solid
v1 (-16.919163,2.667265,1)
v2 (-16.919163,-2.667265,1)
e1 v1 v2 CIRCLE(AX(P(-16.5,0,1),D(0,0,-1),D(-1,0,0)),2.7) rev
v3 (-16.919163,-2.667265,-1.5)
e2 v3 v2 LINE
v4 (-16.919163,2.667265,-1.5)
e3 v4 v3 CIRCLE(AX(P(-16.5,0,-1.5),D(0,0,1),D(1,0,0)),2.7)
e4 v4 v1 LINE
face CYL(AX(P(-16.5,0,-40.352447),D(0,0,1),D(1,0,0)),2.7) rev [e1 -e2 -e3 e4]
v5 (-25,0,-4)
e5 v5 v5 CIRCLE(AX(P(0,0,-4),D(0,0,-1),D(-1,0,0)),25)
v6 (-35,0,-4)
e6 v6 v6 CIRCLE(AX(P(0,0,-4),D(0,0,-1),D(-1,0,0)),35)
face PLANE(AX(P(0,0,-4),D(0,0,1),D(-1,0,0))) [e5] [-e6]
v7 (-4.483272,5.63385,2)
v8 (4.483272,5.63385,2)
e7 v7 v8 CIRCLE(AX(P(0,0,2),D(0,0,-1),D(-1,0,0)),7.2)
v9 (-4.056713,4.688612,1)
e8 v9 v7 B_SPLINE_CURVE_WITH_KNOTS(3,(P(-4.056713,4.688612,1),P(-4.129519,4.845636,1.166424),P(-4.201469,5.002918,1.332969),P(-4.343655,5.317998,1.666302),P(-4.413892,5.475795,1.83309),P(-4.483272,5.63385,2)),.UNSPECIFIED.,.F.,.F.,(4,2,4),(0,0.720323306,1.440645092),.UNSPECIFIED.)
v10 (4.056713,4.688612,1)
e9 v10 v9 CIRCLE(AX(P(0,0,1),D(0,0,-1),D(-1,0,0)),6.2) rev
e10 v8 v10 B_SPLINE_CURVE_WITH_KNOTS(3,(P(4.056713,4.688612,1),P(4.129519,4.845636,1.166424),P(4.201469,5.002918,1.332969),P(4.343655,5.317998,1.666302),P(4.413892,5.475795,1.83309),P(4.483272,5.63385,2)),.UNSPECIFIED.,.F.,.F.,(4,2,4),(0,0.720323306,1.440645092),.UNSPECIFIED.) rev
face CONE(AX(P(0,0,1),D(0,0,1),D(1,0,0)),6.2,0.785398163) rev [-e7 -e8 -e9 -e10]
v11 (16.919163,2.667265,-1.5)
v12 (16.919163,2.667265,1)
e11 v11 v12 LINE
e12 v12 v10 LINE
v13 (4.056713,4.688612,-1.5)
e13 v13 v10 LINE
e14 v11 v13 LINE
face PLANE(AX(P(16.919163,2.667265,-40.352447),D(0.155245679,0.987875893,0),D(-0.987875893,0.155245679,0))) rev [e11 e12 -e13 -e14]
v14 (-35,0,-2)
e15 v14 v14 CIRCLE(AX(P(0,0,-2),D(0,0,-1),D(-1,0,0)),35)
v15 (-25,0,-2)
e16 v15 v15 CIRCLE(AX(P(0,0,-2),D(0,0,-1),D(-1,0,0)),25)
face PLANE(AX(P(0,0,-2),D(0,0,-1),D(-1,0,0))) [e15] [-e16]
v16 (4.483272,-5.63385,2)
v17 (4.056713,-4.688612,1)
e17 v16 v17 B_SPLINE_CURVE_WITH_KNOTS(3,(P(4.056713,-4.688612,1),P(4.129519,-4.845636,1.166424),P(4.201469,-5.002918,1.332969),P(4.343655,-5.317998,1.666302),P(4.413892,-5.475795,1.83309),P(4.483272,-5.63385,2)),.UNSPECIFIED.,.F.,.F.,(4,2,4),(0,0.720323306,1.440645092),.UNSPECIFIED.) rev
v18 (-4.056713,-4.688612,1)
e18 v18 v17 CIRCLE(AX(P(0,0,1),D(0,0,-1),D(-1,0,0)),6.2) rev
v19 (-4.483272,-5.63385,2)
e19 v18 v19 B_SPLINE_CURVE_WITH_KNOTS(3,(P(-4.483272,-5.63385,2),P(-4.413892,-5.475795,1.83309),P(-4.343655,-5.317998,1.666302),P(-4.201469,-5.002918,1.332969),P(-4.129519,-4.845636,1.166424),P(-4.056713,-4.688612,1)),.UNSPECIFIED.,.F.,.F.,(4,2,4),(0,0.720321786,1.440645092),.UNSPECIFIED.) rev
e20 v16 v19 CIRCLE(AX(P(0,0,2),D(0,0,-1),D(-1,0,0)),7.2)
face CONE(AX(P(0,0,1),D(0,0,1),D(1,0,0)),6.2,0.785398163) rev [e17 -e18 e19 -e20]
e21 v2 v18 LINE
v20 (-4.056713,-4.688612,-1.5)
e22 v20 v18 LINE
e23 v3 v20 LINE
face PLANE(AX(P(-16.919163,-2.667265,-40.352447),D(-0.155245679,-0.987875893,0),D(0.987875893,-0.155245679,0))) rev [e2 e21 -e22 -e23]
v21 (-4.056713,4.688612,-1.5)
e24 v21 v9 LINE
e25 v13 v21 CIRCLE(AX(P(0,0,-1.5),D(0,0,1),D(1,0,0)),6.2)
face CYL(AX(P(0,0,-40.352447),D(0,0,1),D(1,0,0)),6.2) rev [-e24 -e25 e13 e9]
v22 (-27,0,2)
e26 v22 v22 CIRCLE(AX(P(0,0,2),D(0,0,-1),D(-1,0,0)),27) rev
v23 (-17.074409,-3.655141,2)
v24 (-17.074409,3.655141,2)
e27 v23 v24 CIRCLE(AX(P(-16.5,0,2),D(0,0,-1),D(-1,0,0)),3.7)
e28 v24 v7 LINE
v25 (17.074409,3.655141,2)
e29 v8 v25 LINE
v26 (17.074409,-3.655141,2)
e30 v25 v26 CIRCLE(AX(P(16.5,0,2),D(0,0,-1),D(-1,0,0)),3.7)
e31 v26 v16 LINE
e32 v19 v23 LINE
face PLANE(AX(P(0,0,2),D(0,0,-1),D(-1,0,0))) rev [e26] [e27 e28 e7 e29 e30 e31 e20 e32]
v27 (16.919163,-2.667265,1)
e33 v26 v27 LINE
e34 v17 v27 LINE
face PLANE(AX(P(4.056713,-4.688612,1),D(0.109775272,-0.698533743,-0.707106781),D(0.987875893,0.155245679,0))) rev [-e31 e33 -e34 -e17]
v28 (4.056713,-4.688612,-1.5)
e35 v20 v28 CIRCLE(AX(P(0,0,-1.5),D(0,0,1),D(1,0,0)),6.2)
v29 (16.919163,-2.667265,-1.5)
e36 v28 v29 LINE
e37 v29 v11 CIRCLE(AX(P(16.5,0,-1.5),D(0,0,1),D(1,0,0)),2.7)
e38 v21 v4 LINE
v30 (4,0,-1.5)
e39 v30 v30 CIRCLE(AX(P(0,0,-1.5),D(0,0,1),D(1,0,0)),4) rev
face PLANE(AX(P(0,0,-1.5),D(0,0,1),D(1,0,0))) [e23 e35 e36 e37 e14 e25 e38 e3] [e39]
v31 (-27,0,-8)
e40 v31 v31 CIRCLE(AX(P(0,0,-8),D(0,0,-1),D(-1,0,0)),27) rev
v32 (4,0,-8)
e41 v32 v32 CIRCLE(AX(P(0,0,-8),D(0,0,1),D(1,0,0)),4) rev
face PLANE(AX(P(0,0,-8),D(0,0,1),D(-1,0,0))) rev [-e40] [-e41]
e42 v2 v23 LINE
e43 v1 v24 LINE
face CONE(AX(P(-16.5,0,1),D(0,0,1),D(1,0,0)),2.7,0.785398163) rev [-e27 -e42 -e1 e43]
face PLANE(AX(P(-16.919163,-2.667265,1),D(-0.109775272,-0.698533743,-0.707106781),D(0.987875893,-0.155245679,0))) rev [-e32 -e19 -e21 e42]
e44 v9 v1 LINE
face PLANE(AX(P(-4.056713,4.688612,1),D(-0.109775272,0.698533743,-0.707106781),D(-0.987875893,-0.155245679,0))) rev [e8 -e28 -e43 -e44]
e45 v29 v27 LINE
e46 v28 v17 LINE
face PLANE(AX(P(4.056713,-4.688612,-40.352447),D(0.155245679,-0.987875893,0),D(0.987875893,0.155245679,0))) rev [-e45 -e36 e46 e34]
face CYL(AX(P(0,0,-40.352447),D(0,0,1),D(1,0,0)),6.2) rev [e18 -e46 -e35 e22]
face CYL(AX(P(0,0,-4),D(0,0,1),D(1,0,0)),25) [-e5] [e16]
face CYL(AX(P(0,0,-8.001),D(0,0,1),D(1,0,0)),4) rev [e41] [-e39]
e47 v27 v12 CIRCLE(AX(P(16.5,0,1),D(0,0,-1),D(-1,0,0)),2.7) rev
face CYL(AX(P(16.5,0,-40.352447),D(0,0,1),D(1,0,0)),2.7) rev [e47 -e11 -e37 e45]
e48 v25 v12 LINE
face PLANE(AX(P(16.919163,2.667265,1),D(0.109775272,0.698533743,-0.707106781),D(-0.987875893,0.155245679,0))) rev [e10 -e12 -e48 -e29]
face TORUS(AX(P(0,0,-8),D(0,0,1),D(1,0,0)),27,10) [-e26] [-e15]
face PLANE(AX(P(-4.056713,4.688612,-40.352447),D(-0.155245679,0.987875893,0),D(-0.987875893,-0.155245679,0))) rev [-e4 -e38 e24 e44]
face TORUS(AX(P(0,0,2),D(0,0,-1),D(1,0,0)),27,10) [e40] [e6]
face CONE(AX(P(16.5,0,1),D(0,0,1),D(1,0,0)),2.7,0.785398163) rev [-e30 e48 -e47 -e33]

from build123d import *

# Parameters (mm, degrees)
SKETCH_1_R               = 1.5
EXTRUDE_1_DEPTH          = 2.3
SKETCH_2_R               = 4.4
EXTRUDE_2_DEPTH          = 3.2
SKETCH_3_R               = 4.4
SKETCH_3_R_2             = 3.4
SKETCH_3_R_3             = 2.75
SKETCH_3_R_4             = 1.5
CUT_EXTRUDE_1_DEPTH      = 1
BOSS_EXTRUDE1_DEPTH      = 2
BOSS_EXTRUDE1_DEPTH_BACK = 2
SKETCH1_R                = 35
INTERSECT2_OUTLINE_R     = 4.4
INTERSECT2_OUTLINE_R_2   = 3.4
INTERSECT2_OUTLINE_R_3   = 2.75
INTERSECT2_DEPTH         = 5.5
INTERSECT2_START         = 1
INTERSECT2_2_OUTLINE_R   = 4.4
INTERSECT2_2_OUTLINE_R_2 = 3.4
INTERSECT2_2_OUTLINE_R_3 = 2.75
INTERSECT2_2_OUTLINE_R_4 = 1.5
INTERSECT2_2_DEPTH       = 4.5
FILLET1_R                = 10
SKETCH2_R                = 25
BOSS_EXTRUDE2_DEPTH      = 2
SKETCH3_R                = 27
BOSS_EXTRUDE3_DEPTH      = 2
SKETCH4_R                = 6
CUT_EXTRUDE1_DEPTH       = 2
CUT_EXTRUDE3_REACH       = 52.14
SKETCH5_R                = 4
CUT_EXTRUDE4_START       = -2
CUT_EXTRUDE4_DEPTH       = 2
CHAMFER1_SIZE            = 1
CUT_EXTRUDE5_DEPTH       = 1.5


# Read off the part's stored shape, not the designer's step: Intersect2
with BuildPart() as part:
    # Эскиз1 → Бобышка-Вытянуть1 (new body)
    with BuildSketch(Plane.XY):
        with BuildLine():
            Line((-3.968626967, 4.5), (-16.888114198, 2.469689731))
            ThreePointArc((-16.888114198, 2.469689731), (-19, 0), (-16.888114198, -2.469689731))
            Line((-16.888114198, -2.469689731), (-3.968626967, -4.5))
            ThreePointArc((-3.968626967, -4.5), (0, -6), (3.968626967, -4.5))
            Line((3.968626967, -4.5), (16.888114198, -2.469689731))
            ThreePointArc((16.888114198, -2.469689731), (19, 0), (16.888114198, 2.469689731))
            Line((16.888114198, 2.469689731), (3.968626967, 4.5))
            ThreePointArc((3.968626967, 4.5), (0, 6), (-3.968626967, 4.5))
        make_face()
        Circle(SKETCH_1_R, mode=Mode.SUBTRACT)
    extrude(amount=EXTRUDE_1_DEPTH)

    # Эскиз2 → Бобышка-Вытянуть2 (add)
    with BuildSketch(Plane.XY.offset(2.3)):
        with Locations(Location((0, 0, 0), (0, 0, 180))):
            Circle(SKETCH_2_R)
        Polygon((0.333439775, 2.639447604), (0, 3.05), (-0.333439775, 2.639447604), (-0.758504156, 2.954178641), (-0.979368078, 2.473601404), (-1.469348706, 2.672735374), (-1.563759083, 2.15232973), (-2.087868673, 2.223354314), (-2.049893354, 1.695819264), (-2.575200173, 1.634271725), (-2.407225286, 1.132754236), (-2.900722375, 0.942501833), (-2.6133024, 0.498514094), (-3.043981522, 0.191511085), (-2.655176114, -0.167049522), (-2.995976115, -0.571513009), (-2.530215347, -0.822116802), (-2.75972251, -1.298626839), (-2.246271844, -1.42552746), (-2.35006539, -1.944143169), (-1.821186821, -1.939366985), (-1.792745019, -2.467501833), (-1.281669931, -2.33134895), (-1.122779886, -2.835818282), (-0.661621006, -2.576843686), (-0.382266362, -3.025949839), (0, -2.660425857), (0.382266362, -3.025949839), (0.661621006, -2.576843686), (1.122779886, -2.835818282), (1.281669931, -2.33134895), (1.792745019, -2.467501833), (1.821186821, -1.939366985), (2.35006539, -1.944143169), (2.246271844, -1.42552746), (2.75972251, -1.298626839), (2.530215347, -0.822116802), (2.995976115, -0.571513009), (2.655176114, -0.167049522), (3.043981522, 0.191511085), (2.6133024, 0.498514094), (2.900722375, 0.942501833), (2.407225286, 1.132754236), (2.575200173, 1.634271725), (2.049893354, 1.695819264), (2.087868673, 2.223354314), (1.563759083, 2.15232973), (1.469348706, 2.672735374), (0.979368078, 2.473601404), (0.758504156, 2.954178641), align=None, mode=Mode.SUBTRACT)
    extrude(amount=EXTRUDE_2_DEPTH)

    # Эскиз3 → Вырез-Вытянуть1 (cut)
    # profile 1 of 2: a face of its own
    with BuildSketch(Plane(origin=(0, 0, 0), x_dir=(-1, 0, 0), z_dir=(0, 0, -1))):
        Circle(SKETCH_3_R)
        Circle(SKETCH_3_R_2, mode=Mode.SUBTRACT)
    # profile 2 of 2: a face of its own
    with BuildSketch(Plane(origin=(0, 0, 0), x_dir=(-1, 0, 0), z_dir=(0, 0, -1))):
        Circle(SKETCH_3_R_3)
        Circle(SKETCH_3_R_4, mode=Mode.SUBTRACT)
    extrude(amount=-CUT_EXTRUDE_1_DEPTH, mode=Mode.SUBTRACT)


with BuildPart() as body_2:
    # Sketch1 → Boss-Extrude1 (new, two sides: drawn at the far end of the back side and taken through both)
    with BuildSketch(Plane(origin=(0, 0, 0), x_dir=(-1, 0, 0), z_dir=(0, 0, -1)).offset(-BOSS_EXTRUDE1_DEPTH_BACK)):
        Circle(SKETCH1_R)
    extrude(amount=BOSS_EXTRUDE1_DEPTH + BOSS_EXTRUDE1_DEPTH_BACK)


with BuildPart() as intersect2_tool:
    # Intersect2 outline → Intersect2 (new body)
    # profile 1 of 2: a face of its own
    with BuildSketch(Plane.XY):
        with BuildLine():
            ThreePointArc((3.968626967, 4.5), (0, 6), (-3.968626967, 4.5))
            Line((-3.968626967, 4.5), (-16.888114198, 2.469689731))
            ThreePointArc((-16.888114198, 2.469689731), (-19, 0), (-16.888114198, -2.469689731))
            Line((-16.888114198, -2.469689731), (-3.968626967, -4.5))
            ThreePointArc((-3.968626967, -4.5), (0, -6), (3.968626967, -4.5))
            Line((3.968626967, -4.5), (16.888114198, -2.469689731))
            ThreePointArc((16.888114198, -2.469689731), (19, 0), (16.888114198, 2.469689731))
            Line((16.888114198, 2.469689731), (3.968626967, 4.5))
        make_face()
        Circle(INTERSECT2_OUTLINE_R, mode=Mode.SUBTRACT)
    # profile 2 of 2: a face of its own
    with BuildSketch(Plane.XY):
        Circle(INTERSECT2_OUTLINE_R_2)
        Circle(INTERSECT2_OUTLINE_R_3, mode=Mode.SUBTRACT)
    extrude(amount=INTERSECT2_DEPTH)


with BuildPart() as part_1:
    add(part.part)

    # Intersect2: cut by intersect2_tool
    add(intersect2_tool.part, mode=Mode.SUBTRACT)


with BuildPart() as body_2_1:
    add(body_2.part)

    # Intersect2: cut by intersect2_tool
    add(intersect2_tool.part, mode=Mode.SUBTRACT)


with BuildPart() as intersect2_2_tool:
    # Intersect2 2 outline → Intersect2 2 (new body)
    # profile 1 of 2: a face of its own
    with BuildSketch(Plane.XY.offset(INTERSECT2_START)):
        Circle(INTERSECT2_2_OUTLINE_R)
        Circle(INTERSECT2_2_OUTLINE_R_2, mode=Mode.SUBTRACT)
    # profile 2 of 2: a face of its own
    with BuildSketch(Plane.XY.offset(INTERSECT2_START)):
        Circle(INTERSECT2_2_OUTLINE_R_3)
        Circle(INTERSECT2_2_OUTLINE_R_4, mode=Mode.SUBTRACT)
    extrude(amount=INTERSECT2_2_DEPTH)


with BuildPart() as part_2:
    add(part_1.part)

    # Intersect2 2: cut by intersect2_2_tool
    add(intersect2_2_tool.part, mode=Mode.SUBTRACT)


with BuildPart() as body_2_2:
    add(body_2_1.part)

    # Intersect2 2: cut by intersect2_2_tool
    add(intersect2_2_tool.part, mode=Mode.SUBTRACT)

    # Fillet1
    # the kernel refuses this fillet: 10 mm, written as the material it takes off along each edge
    with BuildSketch(Plane(origin=(0, 0, 2), x_dir=(-1, 0, 0), z_dir=(0, -1, 0))) as fillet1_piece_1:
        with BuildLine():
            CenterArc((27, 10), FILLET1_R, 270, 53.130102354)
            Line((27, 0), (27, -0.2))
            Line((27, -0.2), (35, -0.2))
            Line((35, -0.2), (35.2, 0))
            ThreePointArc((35.2, 0), (35.2, 2), (35.16, 3.88))
            Line((35.16, 3.88), (35, 4))
        make_face()
    revolve(axis=Axis((0, 0, 2), (0, 0, -1)), mode=Mode.SUBTRACT)


with BuildPart() as body_2_2_1:
    # Mirror9: mirrored copy
    add(body_2_2.part.mirror(Plane.XY.offset(-3)))


with BuildPart() as body_2_3:
    add(body_2_2.part)

    add(body_2_2_1.part)  # Boss-Extrude2 merges body 2 2
    # Sketch2 → Boss-Extrude2 (add)
    with BuildSketch(Plane(origin=(0, 0, -2), x_dir=(-1, 0, 0), z_dir=(0, 0, -1))):
        Circle(SKETCH2_R)
    extrude(amount=BOSS_EXTRUDE2_DEPTH)

    # Sketch3 → Boss-Extrude3 (add)
    with BuildSketch(Plane(origin=(0, 0, -8), x_dir=(-1, 0, 0), z_dir=(0, 0, -1))):
        Circle(SKETCH3_R)
    extrude(amount=-BOSS_EXTRUDE3_DEPTH)

    # Sketch4 → Cut-Extrude1 (cut)
    with BuildSketch(Plane.XY):
        Circle(SKETCH4_R)
    extrude(amount=CUT_EXTRUDE1_DEPTH, mode=Mode.SUBTRACT)

    # Sketch5 → Cut-Extrude3 (cut, up to next)
    with BuildSketch(Plane.XY, mode=Mode.PRIVATE) as cut_extrude3_sk1:
        Circle(SKETCH5_R)
    cut_extrude3_tool1 = extrude(cut_extrude3_sk1.sketch, amount=-CUT_EXTRUDE3_REACH, mode=Mode.PRIVATE) & body_2_3.part
    add(cut_extrude3_tool1.solids().sort_by_distance((0, 0, 0))[0], mode=Mode.SUBTRACT)

    # Sketch6 → Cut-Extrude4 (cut)
    with BuildSketch(Plane.XY.offset(2).offset(CUT_EXTRUDE4_START)):
        with BuildLine():
            Line((16.919163334, 2.66726491), (4.056712891, 4.68861179))
            ThreePointArc((4.056712891, 4.68861179), (0, 6.2), (-4.056712891, 4.68861179))
            Line((-4.056712891, 4.68861179), (-16.919163334, 2.66726491))
            ThreePointArc((-16.919163334, 2.66726491), (-19.2, 0), (-16.919163334, -2.66726491))
            Line((-16.919163334, -2.66726491), (-4.056712891, -4.68861179))
            ThreePointArc((-4.056712891, -4.68861179), (0, -6.2), (4.056712891, -4.68861179))
            Line((4.056712891, -4.68861179), (16.919163334, -2.66726491))
            ThreePointArc((16.919163334, -2.66726491), (19.2, 0), (16.919163334, 2.66726491))
        make_face()
    extrude(amount=CUT_EXTRUDE4_DEPTH, mode=Mode.SUBTRACT)

    # Chamfer1
    chamfer1_edges = [body_2_3.edges().sort_by_distance(p)[0] for p in [
        (0, 6.2, 2),
        (-10.487938112, 3.67793835, 2),
        (-19.2, 0, 2),
        (-10.487938112, -3.67793835, 2),
        (0, -6.2, 2),
        (10.487938112, -3.67793835, 2),
        (19.2, 0, 2),
        (10.487938112, 3.67793835, 2),
    ]]
    chamfer(chamfer1_edges, length=CHAMFER1_SIZE)

    # Sketch8 → Cut-Extrude5 (cut)
    with BuildSketch(Plane.XY):
        with BuildLine():
            Line((-4.056712891, 4.68861179), (-16.919163334, 2.66726491))
            ThreePointArc((-16.919163334, 2.66726491), (-19.2, 0), (-16.919163334, -2.66726491))
            Line((-16.919163334, -2.66726491), (-4.056712891, -4.68861179))
            ThreePointArc((-4.056712891, -4.68861179), (0, -6.2), (4.056712891, -4.68861179))
            Line((4.056712891, -4.68861179), (16.919163334, -2.66726491))
            ThreePointArc((16.919163334, -2.66726491), (19.2, 0), (16.919163334, 2.66726491))
            Line((16.919163334, 2.66726491), (4.056712891, 4.68861179))
            ThreePointArc((4.056712891, 4.68861179), (0, 6.2), (-4.056712891, 4.68861179))
        make_face()
    extrude(amount=-CUT_EXTRUDE5_DEPTH, mode=Mode.SUBTRACT)


solid = body_2_3.part
